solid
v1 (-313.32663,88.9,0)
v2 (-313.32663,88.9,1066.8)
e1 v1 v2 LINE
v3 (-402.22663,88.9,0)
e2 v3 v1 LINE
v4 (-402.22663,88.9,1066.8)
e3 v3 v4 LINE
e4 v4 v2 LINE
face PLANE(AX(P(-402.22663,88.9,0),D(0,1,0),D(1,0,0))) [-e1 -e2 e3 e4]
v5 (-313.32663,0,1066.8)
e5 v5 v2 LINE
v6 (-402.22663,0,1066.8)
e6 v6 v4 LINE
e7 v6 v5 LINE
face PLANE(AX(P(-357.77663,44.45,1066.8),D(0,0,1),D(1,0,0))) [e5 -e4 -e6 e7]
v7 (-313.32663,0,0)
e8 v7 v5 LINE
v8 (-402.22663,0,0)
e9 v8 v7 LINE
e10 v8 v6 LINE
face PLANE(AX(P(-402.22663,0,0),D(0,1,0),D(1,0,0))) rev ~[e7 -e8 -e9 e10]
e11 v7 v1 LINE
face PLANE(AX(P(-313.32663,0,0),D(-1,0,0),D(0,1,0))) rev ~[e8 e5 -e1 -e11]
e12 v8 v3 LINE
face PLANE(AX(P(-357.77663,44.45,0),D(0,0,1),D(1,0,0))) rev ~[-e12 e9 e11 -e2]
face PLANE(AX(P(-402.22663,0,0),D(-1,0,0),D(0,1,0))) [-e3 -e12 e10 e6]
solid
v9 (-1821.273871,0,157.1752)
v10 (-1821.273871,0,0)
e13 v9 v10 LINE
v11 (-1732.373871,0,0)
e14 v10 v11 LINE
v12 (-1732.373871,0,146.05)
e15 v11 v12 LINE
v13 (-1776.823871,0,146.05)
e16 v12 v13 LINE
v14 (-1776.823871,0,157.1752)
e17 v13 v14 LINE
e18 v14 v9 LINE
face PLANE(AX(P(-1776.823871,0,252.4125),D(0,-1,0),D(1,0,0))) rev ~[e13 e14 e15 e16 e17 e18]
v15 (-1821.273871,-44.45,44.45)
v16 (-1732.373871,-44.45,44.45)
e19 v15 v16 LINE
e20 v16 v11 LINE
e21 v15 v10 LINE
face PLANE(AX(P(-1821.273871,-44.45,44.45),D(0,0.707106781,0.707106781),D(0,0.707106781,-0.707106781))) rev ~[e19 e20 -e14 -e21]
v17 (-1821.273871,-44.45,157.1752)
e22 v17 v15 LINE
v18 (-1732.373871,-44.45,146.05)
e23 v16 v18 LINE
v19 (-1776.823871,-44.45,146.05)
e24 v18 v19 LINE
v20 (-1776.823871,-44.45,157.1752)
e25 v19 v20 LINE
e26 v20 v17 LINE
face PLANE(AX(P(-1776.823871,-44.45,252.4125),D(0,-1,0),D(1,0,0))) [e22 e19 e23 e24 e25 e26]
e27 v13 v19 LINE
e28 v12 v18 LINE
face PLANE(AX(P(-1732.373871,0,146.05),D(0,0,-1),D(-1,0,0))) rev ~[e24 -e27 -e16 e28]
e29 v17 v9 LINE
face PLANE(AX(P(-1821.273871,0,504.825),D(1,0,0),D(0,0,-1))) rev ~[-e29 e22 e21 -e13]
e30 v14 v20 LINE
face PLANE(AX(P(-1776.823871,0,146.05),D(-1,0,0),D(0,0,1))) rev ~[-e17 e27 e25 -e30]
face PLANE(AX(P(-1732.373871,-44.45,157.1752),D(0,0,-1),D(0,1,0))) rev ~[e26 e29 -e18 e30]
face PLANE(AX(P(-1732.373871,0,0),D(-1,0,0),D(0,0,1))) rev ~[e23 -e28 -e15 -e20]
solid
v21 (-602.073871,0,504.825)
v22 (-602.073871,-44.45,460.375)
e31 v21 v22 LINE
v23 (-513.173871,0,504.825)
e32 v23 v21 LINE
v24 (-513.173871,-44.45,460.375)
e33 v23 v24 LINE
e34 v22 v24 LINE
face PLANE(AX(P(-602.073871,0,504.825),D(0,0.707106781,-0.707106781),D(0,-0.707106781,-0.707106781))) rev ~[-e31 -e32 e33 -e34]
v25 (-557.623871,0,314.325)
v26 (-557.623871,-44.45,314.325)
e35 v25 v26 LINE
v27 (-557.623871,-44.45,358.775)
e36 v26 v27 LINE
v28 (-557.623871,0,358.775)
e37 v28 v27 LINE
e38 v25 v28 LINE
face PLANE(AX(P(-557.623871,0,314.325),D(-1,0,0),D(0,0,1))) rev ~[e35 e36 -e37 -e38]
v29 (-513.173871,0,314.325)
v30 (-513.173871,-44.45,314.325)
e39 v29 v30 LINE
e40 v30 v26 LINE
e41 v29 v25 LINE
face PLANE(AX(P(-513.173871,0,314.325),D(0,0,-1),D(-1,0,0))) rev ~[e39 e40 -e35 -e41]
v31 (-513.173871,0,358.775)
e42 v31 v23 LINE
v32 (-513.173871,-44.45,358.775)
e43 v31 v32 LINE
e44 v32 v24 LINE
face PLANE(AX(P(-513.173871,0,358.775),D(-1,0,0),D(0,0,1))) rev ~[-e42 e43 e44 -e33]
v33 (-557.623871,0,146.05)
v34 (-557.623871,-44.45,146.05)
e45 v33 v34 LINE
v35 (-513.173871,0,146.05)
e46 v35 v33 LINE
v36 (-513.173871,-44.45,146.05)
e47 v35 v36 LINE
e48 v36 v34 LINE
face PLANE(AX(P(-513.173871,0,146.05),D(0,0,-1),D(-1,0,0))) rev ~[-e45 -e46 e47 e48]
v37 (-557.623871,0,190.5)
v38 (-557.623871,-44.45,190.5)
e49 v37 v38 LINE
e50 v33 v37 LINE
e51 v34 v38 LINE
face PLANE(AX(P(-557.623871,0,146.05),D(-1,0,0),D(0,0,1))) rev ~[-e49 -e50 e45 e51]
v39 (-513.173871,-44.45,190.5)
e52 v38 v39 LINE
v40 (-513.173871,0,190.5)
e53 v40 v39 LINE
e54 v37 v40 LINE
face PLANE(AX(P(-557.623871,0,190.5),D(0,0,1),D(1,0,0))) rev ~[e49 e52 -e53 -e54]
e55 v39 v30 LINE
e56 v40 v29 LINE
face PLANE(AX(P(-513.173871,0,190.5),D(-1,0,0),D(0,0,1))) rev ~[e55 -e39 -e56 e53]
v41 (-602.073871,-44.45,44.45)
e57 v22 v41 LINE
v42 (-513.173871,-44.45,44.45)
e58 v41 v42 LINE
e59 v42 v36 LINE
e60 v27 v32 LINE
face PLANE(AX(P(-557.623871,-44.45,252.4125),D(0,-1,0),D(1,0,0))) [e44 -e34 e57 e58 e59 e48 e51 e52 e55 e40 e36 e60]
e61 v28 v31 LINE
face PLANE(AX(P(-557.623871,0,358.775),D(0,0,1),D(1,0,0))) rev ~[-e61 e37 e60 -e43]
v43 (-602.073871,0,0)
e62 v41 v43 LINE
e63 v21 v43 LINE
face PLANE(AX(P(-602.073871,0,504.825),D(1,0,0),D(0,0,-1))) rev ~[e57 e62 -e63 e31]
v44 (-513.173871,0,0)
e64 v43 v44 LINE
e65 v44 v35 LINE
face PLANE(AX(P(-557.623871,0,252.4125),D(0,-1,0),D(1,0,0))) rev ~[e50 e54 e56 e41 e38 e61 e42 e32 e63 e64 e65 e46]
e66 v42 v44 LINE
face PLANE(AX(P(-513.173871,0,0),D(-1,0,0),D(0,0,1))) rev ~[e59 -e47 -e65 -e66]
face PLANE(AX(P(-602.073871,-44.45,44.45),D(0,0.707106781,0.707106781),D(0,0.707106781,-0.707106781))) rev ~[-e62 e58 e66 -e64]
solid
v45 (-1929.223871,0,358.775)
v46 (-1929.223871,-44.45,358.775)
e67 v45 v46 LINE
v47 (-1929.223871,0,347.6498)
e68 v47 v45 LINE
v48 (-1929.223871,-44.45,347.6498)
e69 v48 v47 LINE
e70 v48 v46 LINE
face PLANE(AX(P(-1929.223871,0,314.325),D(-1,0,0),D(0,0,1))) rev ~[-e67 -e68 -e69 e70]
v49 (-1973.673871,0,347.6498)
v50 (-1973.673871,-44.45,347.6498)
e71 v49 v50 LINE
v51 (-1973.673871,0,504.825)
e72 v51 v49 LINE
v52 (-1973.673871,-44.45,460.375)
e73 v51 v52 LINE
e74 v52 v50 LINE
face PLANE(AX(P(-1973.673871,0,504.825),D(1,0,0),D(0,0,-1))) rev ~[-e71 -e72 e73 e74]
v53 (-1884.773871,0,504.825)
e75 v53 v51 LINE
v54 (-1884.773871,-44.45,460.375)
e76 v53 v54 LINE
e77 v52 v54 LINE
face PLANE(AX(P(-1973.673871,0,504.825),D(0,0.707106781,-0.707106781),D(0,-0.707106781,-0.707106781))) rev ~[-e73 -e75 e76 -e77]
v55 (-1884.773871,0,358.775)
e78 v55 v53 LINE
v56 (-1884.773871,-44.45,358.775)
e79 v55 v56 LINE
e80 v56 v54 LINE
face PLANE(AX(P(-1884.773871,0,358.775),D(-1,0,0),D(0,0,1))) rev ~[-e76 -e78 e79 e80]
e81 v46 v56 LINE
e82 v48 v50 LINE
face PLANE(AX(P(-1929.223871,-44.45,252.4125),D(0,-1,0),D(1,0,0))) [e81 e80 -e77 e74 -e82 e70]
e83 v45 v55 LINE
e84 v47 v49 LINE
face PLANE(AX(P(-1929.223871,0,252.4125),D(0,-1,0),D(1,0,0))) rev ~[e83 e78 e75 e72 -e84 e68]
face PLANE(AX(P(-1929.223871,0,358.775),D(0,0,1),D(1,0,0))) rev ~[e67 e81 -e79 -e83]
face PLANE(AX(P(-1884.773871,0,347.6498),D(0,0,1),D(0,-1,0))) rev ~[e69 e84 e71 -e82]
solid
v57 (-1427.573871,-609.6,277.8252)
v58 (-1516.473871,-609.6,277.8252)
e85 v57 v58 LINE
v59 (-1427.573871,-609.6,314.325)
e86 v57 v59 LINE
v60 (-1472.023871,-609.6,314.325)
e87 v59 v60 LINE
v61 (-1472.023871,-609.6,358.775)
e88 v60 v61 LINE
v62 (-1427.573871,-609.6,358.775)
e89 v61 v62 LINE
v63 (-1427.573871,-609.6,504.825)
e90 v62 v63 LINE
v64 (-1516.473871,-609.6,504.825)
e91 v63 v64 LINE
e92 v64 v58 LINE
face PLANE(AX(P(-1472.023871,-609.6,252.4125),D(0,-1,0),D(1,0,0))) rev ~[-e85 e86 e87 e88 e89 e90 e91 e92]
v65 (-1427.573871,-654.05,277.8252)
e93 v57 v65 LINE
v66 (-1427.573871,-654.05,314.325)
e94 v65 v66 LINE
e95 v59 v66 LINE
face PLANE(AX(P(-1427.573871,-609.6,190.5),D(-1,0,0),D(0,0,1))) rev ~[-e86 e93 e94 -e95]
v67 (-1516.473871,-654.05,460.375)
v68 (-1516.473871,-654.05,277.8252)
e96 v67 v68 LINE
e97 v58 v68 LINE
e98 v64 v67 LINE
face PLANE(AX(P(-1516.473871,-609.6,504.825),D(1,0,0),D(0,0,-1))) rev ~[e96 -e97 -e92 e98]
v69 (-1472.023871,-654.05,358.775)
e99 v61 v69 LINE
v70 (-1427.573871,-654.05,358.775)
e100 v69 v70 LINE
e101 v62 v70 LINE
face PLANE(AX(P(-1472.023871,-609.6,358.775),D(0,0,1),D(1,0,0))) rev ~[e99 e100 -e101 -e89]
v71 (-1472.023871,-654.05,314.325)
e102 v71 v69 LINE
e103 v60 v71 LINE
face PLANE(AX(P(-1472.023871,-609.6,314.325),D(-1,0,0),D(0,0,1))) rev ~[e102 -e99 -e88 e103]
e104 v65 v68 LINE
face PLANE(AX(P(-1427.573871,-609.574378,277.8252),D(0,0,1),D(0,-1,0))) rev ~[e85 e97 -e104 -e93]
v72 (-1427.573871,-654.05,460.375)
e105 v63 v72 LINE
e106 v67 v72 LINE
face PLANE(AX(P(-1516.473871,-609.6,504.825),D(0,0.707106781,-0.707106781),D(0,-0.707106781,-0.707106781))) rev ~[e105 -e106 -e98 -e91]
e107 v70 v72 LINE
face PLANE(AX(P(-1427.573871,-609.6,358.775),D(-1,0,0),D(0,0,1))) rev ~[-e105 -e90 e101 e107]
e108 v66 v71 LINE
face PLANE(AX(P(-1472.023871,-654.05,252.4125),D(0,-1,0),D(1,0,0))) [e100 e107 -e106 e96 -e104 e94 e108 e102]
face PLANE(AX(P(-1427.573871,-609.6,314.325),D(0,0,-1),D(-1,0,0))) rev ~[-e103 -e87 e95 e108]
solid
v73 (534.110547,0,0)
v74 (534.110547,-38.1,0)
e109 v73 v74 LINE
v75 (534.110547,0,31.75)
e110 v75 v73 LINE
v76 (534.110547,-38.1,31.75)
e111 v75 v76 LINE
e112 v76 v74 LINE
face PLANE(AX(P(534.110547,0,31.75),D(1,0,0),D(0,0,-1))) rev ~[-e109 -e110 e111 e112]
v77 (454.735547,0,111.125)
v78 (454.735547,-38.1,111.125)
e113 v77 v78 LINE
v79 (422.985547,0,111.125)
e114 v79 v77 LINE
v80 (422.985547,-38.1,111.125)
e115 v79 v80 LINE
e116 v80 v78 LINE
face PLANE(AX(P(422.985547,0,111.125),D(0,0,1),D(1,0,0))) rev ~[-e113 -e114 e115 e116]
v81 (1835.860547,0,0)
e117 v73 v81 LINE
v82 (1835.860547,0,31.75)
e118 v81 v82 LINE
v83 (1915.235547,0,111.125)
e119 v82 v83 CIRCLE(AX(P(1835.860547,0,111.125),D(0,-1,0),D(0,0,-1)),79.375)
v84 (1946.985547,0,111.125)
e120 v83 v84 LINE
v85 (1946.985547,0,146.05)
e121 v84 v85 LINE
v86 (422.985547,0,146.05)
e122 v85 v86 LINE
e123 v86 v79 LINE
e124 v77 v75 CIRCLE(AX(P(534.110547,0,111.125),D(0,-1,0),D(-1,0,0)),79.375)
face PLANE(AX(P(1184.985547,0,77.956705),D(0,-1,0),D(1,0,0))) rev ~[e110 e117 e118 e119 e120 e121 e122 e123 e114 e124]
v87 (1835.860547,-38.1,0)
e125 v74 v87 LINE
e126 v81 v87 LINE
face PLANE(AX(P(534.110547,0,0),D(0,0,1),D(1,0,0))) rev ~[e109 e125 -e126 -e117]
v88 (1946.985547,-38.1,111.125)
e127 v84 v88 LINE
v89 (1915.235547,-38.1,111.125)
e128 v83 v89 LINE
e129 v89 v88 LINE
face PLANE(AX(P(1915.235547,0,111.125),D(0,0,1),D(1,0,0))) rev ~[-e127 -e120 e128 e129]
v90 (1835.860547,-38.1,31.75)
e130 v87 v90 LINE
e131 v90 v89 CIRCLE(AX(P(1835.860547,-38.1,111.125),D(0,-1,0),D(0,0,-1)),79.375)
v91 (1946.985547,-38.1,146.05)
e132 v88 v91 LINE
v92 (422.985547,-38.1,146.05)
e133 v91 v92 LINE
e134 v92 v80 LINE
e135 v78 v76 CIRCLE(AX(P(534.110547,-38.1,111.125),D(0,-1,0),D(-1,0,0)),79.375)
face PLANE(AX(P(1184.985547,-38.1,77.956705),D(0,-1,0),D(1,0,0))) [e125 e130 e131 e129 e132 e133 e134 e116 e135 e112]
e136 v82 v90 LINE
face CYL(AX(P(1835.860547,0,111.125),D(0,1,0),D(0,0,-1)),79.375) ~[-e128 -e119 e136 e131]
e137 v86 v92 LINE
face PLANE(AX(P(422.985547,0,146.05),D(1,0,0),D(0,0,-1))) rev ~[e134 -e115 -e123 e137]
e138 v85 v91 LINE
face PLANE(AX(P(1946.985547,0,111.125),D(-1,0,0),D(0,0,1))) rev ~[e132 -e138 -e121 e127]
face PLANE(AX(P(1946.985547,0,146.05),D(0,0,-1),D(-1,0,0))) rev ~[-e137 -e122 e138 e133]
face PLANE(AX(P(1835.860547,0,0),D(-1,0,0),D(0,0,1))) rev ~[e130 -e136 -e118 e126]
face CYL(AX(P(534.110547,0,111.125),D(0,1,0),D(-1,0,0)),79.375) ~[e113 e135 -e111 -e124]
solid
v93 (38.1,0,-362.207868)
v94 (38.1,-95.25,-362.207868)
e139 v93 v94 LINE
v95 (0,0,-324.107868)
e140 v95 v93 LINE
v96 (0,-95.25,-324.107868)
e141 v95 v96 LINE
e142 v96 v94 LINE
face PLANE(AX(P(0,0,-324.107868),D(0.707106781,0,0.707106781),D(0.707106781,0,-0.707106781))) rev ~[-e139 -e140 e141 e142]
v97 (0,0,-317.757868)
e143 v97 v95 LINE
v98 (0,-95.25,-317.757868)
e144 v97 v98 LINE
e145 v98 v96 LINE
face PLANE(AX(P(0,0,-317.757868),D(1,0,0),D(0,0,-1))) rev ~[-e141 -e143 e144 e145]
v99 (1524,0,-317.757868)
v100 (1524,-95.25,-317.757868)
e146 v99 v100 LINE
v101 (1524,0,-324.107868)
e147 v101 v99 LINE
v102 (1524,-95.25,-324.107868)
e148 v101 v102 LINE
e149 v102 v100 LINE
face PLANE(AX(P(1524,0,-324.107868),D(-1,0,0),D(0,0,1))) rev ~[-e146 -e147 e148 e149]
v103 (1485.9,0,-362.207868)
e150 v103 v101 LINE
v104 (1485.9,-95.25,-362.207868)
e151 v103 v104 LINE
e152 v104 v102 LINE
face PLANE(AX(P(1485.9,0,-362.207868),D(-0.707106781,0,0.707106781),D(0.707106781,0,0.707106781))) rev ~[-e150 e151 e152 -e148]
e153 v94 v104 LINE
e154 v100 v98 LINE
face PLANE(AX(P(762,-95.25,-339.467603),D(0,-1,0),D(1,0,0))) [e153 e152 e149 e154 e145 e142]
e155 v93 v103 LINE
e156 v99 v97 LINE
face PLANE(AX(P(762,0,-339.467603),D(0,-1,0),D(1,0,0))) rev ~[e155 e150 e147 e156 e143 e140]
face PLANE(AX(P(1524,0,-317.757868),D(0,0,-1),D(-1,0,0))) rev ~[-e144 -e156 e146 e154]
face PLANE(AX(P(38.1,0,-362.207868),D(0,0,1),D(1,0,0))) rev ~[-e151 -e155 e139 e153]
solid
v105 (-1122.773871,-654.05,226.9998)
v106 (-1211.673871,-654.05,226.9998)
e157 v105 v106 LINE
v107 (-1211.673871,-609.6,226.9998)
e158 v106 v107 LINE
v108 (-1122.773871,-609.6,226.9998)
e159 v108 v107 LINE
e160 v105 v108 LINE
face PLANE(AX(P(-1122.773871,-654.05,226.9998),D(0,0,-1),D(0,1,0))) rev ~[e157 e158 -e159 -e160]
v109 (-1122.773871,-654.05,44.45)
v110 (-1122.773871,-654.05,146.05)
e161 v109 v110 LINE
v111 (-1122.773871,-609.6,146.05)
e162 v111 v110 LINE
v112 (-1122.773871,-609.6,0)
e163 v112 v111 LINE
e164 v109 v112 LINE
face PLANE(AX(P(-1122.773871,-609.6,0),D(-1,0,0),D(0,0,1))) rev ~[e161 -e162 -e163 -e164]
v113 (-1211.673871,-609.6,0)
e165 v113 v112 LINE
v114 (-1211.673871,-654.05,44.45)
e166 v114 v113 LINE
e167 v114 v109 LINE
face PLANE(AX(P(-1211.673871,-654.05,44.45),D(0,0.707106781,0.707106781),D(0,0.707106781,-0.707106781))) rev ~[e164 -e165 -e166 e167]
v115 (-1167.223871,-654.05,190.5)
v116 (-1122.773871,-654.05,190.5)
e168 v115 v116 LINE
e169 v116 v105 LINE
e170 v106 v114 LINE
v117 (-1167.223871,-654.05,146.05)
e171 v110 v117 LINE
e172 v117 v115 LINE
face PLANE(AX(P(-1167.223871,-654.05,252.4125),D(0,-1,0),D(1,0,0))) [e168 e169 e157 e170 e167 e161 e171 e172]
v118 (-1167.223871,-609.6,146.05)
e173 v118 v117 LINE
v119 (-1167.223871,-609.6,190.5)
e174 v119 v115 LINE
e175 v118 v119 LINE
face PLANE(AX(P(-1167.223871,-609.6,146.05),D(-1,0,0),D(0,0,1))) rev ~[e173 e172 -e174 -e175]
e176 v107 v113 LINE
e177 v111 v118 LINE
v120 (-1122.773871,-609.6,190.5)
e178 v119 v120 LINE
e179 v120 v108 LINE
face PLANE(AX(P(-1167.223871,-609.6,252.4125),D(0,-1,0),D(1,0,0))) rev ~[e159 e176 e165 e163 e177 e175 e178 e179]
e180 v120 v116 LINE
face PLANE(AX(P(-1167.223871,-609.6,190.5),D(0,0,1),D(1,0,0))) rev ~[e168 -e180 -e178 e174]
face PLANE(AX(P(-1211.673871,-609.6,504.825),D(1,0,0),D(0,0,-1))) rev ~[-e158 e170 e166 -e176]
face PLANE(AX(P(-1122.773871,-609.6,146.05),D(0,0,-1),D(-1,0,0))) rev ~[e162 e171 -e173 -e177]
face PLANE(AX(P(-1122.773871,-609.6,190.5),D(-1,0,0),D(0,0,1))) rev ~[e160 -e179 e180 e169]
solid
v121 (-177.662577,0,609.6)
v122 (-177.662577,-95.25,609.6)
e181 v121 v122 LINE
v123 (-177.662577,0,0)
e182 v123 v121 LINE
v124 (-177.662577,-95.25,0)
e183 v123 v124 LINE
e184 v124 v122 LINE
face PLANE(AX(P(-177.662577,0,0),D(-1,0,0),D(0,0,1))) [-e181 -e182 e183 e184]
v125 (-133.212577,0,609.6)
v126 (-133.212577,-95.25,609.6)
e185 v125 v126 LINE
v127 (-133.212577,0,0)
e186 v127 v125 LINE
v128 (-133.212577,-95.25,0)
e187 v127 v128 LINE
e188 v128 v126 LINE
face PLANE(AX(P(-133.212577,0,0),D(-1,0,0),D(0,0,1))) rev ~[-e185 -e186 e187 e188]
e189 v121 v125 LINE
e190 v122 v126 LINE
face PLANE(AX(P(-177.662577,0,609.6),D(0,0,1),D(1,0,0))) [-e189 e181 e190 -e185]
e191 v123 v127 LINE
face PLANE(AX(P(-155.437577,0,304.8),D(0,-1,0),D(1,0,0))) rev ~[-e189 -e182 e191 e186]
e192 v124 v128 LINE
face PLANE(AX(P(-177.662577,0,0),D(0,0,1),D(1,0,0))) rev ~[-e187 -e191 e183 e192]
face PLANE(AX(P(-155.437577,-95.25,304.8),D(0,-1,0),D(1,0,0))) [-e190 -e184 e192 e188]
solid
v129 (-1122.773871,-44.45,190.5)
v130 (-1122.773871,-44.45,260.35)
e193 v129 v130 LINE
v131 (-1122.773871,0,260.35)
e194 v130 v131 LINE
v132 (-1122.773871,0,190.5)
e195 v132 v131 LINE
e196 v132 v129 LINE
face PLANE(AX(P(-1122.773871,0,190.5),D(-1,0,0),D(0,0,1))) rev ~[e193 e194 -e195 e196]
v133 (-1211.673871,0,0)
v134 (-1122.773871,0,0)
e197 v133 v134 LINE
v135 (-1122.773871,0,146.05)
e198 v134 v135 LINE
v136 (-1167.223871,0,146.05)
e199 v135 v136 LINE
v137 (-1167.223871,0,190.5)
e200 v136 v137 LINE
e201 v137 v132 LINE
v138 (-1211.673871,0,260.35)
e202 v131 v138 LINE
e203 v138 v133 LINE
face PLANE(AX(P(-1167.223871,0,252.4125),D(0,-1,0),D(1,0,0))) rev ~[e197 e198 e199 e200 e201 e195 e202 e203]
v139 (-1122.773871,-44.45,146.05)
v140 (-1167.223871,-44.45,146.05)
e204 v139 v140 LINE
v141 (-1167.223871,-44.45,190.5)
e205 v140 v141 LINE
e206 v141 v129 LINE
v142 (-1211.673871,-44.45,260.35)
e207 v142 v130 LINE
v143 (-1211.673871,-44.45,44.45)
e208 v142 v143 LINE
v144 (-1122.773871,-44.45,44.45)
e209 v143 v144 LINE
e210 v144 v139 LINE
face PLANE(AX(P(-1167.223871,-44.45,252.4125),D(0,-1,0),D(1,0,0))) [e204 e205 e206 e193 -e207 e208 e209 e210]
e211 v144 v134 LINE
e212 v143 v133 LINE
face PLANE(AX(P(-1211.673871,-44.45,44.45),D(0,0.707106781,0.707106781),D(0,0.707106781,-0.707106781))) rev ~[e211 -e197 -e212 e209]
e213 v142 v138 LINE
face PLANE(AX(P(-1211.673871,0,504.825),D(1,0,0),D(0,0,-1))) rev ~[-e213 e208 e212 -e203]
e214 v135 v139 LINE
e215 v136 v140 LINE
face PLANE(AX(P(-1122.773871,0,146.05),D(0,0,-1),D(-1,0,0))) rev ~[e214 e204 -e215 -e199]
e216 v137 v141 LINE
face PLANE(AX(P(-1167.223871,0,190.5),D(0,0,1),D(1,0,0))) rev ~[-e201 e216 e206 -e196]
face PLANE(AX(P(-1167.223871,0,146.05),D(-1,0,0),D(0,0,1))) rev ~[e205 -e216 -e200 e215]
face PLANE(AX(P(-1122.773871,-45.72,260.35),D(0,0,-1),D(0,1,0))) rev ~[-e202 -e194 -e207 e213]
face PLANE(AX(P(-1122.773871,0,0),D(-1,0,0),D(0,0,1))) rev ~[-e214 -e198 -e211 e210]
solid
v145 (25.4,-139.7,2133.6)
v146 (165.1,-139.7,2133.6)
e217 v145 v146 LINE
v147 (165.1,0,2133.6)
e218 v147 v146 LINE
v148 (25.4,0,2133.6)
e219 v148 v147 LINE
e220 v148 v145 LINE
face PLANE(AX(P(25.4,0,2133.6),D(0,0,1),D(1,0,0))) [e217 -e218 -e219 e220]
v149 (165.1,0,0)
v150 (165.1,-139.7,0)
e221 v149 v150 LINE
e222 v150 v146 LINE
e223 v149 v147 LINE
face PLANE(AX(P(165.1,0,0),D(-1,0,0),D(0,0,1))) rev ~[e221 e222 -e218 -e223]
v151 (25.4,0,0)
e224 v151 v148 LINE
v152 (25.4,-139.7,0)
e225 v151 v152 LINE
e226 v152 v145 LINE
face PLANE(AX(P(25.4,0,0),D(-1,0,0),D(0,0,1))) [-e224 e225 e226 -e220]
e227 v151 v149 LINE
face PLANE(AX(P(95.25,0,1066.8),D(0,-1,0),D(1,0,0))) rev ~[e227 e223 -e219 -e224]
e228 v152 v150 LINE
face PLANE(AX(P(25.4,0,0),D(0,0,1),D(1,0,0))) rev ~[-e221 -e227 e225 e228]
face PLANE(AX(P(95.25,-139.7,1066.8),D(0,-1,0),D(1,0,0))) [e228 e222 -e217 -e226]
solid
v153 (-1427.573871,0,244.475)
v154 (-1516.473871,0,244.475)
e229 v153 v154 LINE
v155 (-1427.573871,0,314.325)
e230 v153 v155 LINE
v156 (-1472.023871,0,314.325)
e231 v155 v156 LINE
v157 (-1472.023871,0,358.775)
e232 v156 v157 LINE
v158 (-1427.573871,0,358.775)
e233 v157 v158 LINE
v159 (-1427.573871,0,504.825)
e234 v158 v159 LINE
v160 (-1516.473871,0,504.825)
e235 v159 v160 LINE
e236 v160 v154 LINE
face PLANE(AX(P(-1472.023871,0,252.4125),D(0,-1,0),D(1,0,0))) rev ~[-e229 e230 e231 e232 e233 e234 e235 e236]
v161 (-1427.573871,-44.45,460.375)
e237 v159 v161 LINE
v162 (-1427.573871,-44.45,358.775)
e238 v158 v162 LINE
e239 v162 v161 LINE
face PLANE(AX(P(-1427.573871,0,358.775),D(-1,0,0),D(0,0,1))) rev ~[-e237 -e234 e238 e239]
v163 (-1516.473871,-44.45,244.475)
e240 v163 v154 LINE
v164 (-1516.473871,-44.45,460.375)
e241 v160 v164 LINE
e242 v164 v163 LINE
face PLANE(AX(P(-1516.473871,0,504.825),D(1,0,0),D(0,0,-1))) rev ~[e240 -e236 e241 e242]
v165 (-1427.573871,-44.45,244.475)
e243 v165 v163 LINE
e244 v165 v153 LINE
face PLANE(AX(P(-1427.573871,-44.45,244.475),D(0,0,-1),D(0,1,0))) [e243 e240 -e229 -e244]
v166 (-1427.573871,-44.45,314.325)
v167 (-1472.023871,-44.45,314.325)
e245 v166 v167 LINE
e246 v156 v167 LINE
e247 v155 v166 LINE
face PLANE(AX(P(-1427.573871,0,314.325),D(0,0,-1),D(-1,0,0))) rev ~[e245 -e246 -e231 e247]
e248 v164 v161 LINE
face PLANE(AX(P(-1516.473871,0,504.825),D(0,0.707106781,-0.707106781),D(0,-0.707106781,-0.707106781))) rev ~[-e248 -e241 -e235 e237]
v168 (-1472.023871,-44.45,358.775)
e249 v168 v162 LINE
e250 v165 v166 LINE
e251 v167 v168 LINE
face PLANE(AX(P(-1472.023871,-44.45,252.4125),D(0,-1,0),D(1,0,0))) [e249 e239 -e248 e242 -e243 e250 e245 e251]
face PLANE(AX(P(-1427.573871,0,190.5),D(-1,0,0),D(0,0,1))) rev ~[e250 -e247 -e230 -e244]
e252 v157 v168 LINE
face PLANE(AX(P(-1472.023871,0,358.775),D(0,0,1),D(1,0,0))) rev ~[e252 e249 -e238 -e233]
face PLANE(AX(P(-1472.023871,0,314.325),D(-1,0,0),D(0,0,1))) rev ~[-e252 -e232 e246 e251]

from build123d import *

# Parameters (mm, degrees)
F0_W      = 139.7
F0_H      = 2133.6
F1_DEPTH  = 139.7
F3_DEPTH  = 38.1
F5_DEPTH  = 95.25
F6_W      = 88.9
F6_H      = 88.9
F7_DEPTH  = 1066.8
F8_W      = 44.45
F8_H      = 609.6
F9_DEPTH  = 95.25
F11_DEPTH = 44.45
F13_DEPTH = 88.9
F16_DEPTH = 101.6
F18_W     = 44.45
F18_H     = 242.5570257008
F18_H_2   = 53.975
F19_DEPTH = 101.6
F21_W     = 44.45
F21_H     = 190.5
F21_H_2   = 123.825
F21_H_3   = 33.3248
F22_DEPTH = 101.6
F24_W     = 44.45
F24_H     = 123.825
F25_DEPTH = 101.6
F27_W     = 44.45
F27_H     = 87.3252
F27_H_2   = 192.8097355843
F28_DEPTH = 101.6
F30_W     = 44.45
F30_H     = 87.3252
F31_DEPTH = 101.6


with BuildPart() as f1:
    # F0 (on Front) → F1 (new body)
    with BuildSketch(Plane.XZ):
        with Locations((95.25, 1066.8)):
            Rectangle(F0_W, F0_H)
    extrude(amount=F1_DEPTH)


with BuildPart() as f3:
    # F2 (on Front) → F3 (new body)
    with BuildSketch(Plane.XZ):
        with BuildLine():
            Line((534.11054703, 31.75), (534.11054703, 0))
            Line((534.11054703, 0), (1835.86054703, 0))
            Line((1835.86054703, 0), (1835.86054703, 31.75))
            ThreePointArc((1835.86054703, 31.75), (1891.9871477866, 54.9983992433), (1915.23554703, 111.125))
            Line((1915.23554703, 111.125), (1946.98554703, 111.125))
            Line((1946.98554703, 111.125), (1946.98554703, 146.05))
            Line((1946.98554703, 146.05), (422.98554703, 146.05))
            Line((422.98554703, 146.05), (422.98554703, 111.125))
            Line((422.98554703, 111.125), (454.73554703, 111.125))
            ThreePointArc((454.73554703, 111.125), (477.9839462733, 54.9983992433), (534.11054703, 31.75))
        make_face()
    extrude(amount=F3_DEPTH)


with BuildPart() as f5:
    # F4 (on Front) → F5 (new body)
    with BuildSketch(Plane.XZ):
        Polygon((1524, -317.7578675234), (0, -317.7578675234), (0, -324.1078675234), (38.1, -362.2078675234), (1485.9, -362.2078675234), (1524, -324.1078675234), align=None)
    extrude(amount=F5_DEPTH)


with BuildPart() as f7:
    # F6 (on Top) → F7 (new body)
    with BuildSketch(Plane.XY):
        with Locations((-357.7766300052, 44.45)):
            Rectangle(F6_W, F6_H)
    extrude(amount=F7_DEPTH)


with BuildPart() as f9:
    # F8 (on Front) → F9 (new body)
    with BuildSketch(Plane.XZ):
        with Locations((-155.4375765641, 304.8)):
            Rectangle(F8_W, F8_H)
    extrude(amount=F9_DEPTH)


with BuildPart() as f11:
    # F10 (on Front) → F11 (new body)
    with BuildSketch(Plane.XZ):
        Polygon((-602.0738712236, 504.825), (-602.0738712236, 0), (-513.1738712236, 0), (-513.1738712236, 146.05), (-557.6238712236, 146.05), (-557.6238712236, 190.5), (-513.1738712236, 190.5), (-513.1738712236, 314.325), (-557.6238712236, 314.325), (-557.6238712236, 358.775), (-513.1738712236, 358.775), (-513.1738712236, 504.825), align=None)
    extrude(amount=F11_DEPTH)

    # F12 (on face) → F13 (cut)
    with BuildSketch(Plane(origin=(-602.0738712236, 0, 0), x_dir=(0, -1, 0), z_dir=(-1, 0, 0))):
        Polygon((44.45, 504.825), (0, 504.825), (44.45, 460.375), align=None)
        Polygon((44.45, 44.45), (0, 0), (44.45, 0), align=None)
    extrude(amount=-F13_DEPTH, mode=Mode.SUBTRACT)


with BuildPart() as f14_1:
    # F14: copy of F11
    add(f11.part.moved(Location((-609.6, 0, 0))))

    # F15 (on face) → F16 (cut)
    with BuildSketch(Plane.YZ.offset(-1122.7738712236)):
        Polygon((-45.72, 260.35), (0, 260.35), (0, 358.775), (-44.45, 358.775), (-44.45, 460.375), (0, 504.825), (0, 768.35), (-45.72, 768.35), align=None)
        Polygon((-44.45, 358.775), (0, 358.775), (0, 504.825), (-44.45, 460.375), align=None)
    extrude(amount=-F16_DEPTH, mode=Mode.SUBTRACT)


with BuildPart() as f17_1:
    # F17: copy of F11
    add(f11.part.moved(Location((-914.4, 0, 0))))

    # F18 (on face) → F19 (cut)
    with BuildSketch(Plane.YZ.offset(-1427.5738712236)):
        with Locations((-22.225, 69.2214871496)):
            Rectangle(F18_W, F18_H)
        with Locations((-22.225, 217.4875)):
            Rectangle(F18_W, F18_H_2)
    extrude(amount=-F19_DEPTH, mode=Mode.SUBTRACT)


with BuildPart() as f20_1:
    # F20: copy of F11
    add(f11.part.moved(Location((-1219.2, 0, 0))))

    # F21 (on face) → F22 (cut)
    with BuildSketch(Plane.YZ.offset(-1732.3738712236)):
        with Locations((-22.225, 409.575)):
            Rectangle(F21_W, F21_H)
        with Locations((-22.225, 252.4125)):
            Rectangle(F21_W, F21_H_2)
        with Locations((-22.225, 173.8376)):
            Rectangle(F21_W, F21_H_3)
    extrude(amount=-F22_DEPTH, mode=Mode.SUBTRACT)


with BuildPart() as f23_1:
    # F23: copy of F11
    add(f11.part.moved(Location((-1371.6, 0, 0))))

    # F24 (on face) → F25 (cut)
    with BuildSketch(Plane.YZ.offset(-1884.7738712236)):
        Polygon((-51.1882424594, 0), (0, 0), (0, 190.5), (-44.45, 190.5), (-44.45, 314.325), (0, 314.325), (0, 347.6498), (-51.1882424594, 347.6498), align=None)
        with Locations((-22.225, 252.4125)):
            Rectangle(F24_W, F24_H)
    extrude(amount=-F25_DEPTH, mode=Mode.SUBTRACT)


with BuildPart() as f26_1:
    # F26: copy of F11
    add(f11.part.moved(Location((-609.6, -609.6, 0))))

    # F27 (on face) → F28 (cut)
    with BuildSketch(Plane.YZ.offset(-1122.7738712236)):
        with Locations((-631.825, 270.6624)):
            Rectangle(F27_W, F27_H)
        with Locations((-631.825, 410.7298677921)):
            Rectangle(F27_W, F27_H_2)
    extrude(amount=-F28_DEPTH, mode=Mode.SUBTRACT)


with BuildPart() as f29_1:
    # F29: copy of F11
    add(f11.part.moved(Location((-914.4, -609.6, 0))))

    # F30 (on face) → F31 (cut)
    with BuildSketch(Plane.YZ.offset(-1427.5738712236)):
        Polygon((-654.05, 0), (-609.5743775368, 0), (-609.5743775368, 277.8252), (-609.6, 277.8252), (-609.6, 190.5), (-654.05, 190.5), align=None)
        with Locations((-631.825, 234.1626)):
            Rectangle(F30_W, F30_H)
    extrude(amount=-F31_DEPTH, mode=Mode.SUBTRACT)


solid = Compound([f1.part, f3.part, f5.part, f7.part, f9.part, f11.part, f14_1.part, f17_1.part, f20_1.part, f23_1.part, f26_1.part, f29_1.part])
